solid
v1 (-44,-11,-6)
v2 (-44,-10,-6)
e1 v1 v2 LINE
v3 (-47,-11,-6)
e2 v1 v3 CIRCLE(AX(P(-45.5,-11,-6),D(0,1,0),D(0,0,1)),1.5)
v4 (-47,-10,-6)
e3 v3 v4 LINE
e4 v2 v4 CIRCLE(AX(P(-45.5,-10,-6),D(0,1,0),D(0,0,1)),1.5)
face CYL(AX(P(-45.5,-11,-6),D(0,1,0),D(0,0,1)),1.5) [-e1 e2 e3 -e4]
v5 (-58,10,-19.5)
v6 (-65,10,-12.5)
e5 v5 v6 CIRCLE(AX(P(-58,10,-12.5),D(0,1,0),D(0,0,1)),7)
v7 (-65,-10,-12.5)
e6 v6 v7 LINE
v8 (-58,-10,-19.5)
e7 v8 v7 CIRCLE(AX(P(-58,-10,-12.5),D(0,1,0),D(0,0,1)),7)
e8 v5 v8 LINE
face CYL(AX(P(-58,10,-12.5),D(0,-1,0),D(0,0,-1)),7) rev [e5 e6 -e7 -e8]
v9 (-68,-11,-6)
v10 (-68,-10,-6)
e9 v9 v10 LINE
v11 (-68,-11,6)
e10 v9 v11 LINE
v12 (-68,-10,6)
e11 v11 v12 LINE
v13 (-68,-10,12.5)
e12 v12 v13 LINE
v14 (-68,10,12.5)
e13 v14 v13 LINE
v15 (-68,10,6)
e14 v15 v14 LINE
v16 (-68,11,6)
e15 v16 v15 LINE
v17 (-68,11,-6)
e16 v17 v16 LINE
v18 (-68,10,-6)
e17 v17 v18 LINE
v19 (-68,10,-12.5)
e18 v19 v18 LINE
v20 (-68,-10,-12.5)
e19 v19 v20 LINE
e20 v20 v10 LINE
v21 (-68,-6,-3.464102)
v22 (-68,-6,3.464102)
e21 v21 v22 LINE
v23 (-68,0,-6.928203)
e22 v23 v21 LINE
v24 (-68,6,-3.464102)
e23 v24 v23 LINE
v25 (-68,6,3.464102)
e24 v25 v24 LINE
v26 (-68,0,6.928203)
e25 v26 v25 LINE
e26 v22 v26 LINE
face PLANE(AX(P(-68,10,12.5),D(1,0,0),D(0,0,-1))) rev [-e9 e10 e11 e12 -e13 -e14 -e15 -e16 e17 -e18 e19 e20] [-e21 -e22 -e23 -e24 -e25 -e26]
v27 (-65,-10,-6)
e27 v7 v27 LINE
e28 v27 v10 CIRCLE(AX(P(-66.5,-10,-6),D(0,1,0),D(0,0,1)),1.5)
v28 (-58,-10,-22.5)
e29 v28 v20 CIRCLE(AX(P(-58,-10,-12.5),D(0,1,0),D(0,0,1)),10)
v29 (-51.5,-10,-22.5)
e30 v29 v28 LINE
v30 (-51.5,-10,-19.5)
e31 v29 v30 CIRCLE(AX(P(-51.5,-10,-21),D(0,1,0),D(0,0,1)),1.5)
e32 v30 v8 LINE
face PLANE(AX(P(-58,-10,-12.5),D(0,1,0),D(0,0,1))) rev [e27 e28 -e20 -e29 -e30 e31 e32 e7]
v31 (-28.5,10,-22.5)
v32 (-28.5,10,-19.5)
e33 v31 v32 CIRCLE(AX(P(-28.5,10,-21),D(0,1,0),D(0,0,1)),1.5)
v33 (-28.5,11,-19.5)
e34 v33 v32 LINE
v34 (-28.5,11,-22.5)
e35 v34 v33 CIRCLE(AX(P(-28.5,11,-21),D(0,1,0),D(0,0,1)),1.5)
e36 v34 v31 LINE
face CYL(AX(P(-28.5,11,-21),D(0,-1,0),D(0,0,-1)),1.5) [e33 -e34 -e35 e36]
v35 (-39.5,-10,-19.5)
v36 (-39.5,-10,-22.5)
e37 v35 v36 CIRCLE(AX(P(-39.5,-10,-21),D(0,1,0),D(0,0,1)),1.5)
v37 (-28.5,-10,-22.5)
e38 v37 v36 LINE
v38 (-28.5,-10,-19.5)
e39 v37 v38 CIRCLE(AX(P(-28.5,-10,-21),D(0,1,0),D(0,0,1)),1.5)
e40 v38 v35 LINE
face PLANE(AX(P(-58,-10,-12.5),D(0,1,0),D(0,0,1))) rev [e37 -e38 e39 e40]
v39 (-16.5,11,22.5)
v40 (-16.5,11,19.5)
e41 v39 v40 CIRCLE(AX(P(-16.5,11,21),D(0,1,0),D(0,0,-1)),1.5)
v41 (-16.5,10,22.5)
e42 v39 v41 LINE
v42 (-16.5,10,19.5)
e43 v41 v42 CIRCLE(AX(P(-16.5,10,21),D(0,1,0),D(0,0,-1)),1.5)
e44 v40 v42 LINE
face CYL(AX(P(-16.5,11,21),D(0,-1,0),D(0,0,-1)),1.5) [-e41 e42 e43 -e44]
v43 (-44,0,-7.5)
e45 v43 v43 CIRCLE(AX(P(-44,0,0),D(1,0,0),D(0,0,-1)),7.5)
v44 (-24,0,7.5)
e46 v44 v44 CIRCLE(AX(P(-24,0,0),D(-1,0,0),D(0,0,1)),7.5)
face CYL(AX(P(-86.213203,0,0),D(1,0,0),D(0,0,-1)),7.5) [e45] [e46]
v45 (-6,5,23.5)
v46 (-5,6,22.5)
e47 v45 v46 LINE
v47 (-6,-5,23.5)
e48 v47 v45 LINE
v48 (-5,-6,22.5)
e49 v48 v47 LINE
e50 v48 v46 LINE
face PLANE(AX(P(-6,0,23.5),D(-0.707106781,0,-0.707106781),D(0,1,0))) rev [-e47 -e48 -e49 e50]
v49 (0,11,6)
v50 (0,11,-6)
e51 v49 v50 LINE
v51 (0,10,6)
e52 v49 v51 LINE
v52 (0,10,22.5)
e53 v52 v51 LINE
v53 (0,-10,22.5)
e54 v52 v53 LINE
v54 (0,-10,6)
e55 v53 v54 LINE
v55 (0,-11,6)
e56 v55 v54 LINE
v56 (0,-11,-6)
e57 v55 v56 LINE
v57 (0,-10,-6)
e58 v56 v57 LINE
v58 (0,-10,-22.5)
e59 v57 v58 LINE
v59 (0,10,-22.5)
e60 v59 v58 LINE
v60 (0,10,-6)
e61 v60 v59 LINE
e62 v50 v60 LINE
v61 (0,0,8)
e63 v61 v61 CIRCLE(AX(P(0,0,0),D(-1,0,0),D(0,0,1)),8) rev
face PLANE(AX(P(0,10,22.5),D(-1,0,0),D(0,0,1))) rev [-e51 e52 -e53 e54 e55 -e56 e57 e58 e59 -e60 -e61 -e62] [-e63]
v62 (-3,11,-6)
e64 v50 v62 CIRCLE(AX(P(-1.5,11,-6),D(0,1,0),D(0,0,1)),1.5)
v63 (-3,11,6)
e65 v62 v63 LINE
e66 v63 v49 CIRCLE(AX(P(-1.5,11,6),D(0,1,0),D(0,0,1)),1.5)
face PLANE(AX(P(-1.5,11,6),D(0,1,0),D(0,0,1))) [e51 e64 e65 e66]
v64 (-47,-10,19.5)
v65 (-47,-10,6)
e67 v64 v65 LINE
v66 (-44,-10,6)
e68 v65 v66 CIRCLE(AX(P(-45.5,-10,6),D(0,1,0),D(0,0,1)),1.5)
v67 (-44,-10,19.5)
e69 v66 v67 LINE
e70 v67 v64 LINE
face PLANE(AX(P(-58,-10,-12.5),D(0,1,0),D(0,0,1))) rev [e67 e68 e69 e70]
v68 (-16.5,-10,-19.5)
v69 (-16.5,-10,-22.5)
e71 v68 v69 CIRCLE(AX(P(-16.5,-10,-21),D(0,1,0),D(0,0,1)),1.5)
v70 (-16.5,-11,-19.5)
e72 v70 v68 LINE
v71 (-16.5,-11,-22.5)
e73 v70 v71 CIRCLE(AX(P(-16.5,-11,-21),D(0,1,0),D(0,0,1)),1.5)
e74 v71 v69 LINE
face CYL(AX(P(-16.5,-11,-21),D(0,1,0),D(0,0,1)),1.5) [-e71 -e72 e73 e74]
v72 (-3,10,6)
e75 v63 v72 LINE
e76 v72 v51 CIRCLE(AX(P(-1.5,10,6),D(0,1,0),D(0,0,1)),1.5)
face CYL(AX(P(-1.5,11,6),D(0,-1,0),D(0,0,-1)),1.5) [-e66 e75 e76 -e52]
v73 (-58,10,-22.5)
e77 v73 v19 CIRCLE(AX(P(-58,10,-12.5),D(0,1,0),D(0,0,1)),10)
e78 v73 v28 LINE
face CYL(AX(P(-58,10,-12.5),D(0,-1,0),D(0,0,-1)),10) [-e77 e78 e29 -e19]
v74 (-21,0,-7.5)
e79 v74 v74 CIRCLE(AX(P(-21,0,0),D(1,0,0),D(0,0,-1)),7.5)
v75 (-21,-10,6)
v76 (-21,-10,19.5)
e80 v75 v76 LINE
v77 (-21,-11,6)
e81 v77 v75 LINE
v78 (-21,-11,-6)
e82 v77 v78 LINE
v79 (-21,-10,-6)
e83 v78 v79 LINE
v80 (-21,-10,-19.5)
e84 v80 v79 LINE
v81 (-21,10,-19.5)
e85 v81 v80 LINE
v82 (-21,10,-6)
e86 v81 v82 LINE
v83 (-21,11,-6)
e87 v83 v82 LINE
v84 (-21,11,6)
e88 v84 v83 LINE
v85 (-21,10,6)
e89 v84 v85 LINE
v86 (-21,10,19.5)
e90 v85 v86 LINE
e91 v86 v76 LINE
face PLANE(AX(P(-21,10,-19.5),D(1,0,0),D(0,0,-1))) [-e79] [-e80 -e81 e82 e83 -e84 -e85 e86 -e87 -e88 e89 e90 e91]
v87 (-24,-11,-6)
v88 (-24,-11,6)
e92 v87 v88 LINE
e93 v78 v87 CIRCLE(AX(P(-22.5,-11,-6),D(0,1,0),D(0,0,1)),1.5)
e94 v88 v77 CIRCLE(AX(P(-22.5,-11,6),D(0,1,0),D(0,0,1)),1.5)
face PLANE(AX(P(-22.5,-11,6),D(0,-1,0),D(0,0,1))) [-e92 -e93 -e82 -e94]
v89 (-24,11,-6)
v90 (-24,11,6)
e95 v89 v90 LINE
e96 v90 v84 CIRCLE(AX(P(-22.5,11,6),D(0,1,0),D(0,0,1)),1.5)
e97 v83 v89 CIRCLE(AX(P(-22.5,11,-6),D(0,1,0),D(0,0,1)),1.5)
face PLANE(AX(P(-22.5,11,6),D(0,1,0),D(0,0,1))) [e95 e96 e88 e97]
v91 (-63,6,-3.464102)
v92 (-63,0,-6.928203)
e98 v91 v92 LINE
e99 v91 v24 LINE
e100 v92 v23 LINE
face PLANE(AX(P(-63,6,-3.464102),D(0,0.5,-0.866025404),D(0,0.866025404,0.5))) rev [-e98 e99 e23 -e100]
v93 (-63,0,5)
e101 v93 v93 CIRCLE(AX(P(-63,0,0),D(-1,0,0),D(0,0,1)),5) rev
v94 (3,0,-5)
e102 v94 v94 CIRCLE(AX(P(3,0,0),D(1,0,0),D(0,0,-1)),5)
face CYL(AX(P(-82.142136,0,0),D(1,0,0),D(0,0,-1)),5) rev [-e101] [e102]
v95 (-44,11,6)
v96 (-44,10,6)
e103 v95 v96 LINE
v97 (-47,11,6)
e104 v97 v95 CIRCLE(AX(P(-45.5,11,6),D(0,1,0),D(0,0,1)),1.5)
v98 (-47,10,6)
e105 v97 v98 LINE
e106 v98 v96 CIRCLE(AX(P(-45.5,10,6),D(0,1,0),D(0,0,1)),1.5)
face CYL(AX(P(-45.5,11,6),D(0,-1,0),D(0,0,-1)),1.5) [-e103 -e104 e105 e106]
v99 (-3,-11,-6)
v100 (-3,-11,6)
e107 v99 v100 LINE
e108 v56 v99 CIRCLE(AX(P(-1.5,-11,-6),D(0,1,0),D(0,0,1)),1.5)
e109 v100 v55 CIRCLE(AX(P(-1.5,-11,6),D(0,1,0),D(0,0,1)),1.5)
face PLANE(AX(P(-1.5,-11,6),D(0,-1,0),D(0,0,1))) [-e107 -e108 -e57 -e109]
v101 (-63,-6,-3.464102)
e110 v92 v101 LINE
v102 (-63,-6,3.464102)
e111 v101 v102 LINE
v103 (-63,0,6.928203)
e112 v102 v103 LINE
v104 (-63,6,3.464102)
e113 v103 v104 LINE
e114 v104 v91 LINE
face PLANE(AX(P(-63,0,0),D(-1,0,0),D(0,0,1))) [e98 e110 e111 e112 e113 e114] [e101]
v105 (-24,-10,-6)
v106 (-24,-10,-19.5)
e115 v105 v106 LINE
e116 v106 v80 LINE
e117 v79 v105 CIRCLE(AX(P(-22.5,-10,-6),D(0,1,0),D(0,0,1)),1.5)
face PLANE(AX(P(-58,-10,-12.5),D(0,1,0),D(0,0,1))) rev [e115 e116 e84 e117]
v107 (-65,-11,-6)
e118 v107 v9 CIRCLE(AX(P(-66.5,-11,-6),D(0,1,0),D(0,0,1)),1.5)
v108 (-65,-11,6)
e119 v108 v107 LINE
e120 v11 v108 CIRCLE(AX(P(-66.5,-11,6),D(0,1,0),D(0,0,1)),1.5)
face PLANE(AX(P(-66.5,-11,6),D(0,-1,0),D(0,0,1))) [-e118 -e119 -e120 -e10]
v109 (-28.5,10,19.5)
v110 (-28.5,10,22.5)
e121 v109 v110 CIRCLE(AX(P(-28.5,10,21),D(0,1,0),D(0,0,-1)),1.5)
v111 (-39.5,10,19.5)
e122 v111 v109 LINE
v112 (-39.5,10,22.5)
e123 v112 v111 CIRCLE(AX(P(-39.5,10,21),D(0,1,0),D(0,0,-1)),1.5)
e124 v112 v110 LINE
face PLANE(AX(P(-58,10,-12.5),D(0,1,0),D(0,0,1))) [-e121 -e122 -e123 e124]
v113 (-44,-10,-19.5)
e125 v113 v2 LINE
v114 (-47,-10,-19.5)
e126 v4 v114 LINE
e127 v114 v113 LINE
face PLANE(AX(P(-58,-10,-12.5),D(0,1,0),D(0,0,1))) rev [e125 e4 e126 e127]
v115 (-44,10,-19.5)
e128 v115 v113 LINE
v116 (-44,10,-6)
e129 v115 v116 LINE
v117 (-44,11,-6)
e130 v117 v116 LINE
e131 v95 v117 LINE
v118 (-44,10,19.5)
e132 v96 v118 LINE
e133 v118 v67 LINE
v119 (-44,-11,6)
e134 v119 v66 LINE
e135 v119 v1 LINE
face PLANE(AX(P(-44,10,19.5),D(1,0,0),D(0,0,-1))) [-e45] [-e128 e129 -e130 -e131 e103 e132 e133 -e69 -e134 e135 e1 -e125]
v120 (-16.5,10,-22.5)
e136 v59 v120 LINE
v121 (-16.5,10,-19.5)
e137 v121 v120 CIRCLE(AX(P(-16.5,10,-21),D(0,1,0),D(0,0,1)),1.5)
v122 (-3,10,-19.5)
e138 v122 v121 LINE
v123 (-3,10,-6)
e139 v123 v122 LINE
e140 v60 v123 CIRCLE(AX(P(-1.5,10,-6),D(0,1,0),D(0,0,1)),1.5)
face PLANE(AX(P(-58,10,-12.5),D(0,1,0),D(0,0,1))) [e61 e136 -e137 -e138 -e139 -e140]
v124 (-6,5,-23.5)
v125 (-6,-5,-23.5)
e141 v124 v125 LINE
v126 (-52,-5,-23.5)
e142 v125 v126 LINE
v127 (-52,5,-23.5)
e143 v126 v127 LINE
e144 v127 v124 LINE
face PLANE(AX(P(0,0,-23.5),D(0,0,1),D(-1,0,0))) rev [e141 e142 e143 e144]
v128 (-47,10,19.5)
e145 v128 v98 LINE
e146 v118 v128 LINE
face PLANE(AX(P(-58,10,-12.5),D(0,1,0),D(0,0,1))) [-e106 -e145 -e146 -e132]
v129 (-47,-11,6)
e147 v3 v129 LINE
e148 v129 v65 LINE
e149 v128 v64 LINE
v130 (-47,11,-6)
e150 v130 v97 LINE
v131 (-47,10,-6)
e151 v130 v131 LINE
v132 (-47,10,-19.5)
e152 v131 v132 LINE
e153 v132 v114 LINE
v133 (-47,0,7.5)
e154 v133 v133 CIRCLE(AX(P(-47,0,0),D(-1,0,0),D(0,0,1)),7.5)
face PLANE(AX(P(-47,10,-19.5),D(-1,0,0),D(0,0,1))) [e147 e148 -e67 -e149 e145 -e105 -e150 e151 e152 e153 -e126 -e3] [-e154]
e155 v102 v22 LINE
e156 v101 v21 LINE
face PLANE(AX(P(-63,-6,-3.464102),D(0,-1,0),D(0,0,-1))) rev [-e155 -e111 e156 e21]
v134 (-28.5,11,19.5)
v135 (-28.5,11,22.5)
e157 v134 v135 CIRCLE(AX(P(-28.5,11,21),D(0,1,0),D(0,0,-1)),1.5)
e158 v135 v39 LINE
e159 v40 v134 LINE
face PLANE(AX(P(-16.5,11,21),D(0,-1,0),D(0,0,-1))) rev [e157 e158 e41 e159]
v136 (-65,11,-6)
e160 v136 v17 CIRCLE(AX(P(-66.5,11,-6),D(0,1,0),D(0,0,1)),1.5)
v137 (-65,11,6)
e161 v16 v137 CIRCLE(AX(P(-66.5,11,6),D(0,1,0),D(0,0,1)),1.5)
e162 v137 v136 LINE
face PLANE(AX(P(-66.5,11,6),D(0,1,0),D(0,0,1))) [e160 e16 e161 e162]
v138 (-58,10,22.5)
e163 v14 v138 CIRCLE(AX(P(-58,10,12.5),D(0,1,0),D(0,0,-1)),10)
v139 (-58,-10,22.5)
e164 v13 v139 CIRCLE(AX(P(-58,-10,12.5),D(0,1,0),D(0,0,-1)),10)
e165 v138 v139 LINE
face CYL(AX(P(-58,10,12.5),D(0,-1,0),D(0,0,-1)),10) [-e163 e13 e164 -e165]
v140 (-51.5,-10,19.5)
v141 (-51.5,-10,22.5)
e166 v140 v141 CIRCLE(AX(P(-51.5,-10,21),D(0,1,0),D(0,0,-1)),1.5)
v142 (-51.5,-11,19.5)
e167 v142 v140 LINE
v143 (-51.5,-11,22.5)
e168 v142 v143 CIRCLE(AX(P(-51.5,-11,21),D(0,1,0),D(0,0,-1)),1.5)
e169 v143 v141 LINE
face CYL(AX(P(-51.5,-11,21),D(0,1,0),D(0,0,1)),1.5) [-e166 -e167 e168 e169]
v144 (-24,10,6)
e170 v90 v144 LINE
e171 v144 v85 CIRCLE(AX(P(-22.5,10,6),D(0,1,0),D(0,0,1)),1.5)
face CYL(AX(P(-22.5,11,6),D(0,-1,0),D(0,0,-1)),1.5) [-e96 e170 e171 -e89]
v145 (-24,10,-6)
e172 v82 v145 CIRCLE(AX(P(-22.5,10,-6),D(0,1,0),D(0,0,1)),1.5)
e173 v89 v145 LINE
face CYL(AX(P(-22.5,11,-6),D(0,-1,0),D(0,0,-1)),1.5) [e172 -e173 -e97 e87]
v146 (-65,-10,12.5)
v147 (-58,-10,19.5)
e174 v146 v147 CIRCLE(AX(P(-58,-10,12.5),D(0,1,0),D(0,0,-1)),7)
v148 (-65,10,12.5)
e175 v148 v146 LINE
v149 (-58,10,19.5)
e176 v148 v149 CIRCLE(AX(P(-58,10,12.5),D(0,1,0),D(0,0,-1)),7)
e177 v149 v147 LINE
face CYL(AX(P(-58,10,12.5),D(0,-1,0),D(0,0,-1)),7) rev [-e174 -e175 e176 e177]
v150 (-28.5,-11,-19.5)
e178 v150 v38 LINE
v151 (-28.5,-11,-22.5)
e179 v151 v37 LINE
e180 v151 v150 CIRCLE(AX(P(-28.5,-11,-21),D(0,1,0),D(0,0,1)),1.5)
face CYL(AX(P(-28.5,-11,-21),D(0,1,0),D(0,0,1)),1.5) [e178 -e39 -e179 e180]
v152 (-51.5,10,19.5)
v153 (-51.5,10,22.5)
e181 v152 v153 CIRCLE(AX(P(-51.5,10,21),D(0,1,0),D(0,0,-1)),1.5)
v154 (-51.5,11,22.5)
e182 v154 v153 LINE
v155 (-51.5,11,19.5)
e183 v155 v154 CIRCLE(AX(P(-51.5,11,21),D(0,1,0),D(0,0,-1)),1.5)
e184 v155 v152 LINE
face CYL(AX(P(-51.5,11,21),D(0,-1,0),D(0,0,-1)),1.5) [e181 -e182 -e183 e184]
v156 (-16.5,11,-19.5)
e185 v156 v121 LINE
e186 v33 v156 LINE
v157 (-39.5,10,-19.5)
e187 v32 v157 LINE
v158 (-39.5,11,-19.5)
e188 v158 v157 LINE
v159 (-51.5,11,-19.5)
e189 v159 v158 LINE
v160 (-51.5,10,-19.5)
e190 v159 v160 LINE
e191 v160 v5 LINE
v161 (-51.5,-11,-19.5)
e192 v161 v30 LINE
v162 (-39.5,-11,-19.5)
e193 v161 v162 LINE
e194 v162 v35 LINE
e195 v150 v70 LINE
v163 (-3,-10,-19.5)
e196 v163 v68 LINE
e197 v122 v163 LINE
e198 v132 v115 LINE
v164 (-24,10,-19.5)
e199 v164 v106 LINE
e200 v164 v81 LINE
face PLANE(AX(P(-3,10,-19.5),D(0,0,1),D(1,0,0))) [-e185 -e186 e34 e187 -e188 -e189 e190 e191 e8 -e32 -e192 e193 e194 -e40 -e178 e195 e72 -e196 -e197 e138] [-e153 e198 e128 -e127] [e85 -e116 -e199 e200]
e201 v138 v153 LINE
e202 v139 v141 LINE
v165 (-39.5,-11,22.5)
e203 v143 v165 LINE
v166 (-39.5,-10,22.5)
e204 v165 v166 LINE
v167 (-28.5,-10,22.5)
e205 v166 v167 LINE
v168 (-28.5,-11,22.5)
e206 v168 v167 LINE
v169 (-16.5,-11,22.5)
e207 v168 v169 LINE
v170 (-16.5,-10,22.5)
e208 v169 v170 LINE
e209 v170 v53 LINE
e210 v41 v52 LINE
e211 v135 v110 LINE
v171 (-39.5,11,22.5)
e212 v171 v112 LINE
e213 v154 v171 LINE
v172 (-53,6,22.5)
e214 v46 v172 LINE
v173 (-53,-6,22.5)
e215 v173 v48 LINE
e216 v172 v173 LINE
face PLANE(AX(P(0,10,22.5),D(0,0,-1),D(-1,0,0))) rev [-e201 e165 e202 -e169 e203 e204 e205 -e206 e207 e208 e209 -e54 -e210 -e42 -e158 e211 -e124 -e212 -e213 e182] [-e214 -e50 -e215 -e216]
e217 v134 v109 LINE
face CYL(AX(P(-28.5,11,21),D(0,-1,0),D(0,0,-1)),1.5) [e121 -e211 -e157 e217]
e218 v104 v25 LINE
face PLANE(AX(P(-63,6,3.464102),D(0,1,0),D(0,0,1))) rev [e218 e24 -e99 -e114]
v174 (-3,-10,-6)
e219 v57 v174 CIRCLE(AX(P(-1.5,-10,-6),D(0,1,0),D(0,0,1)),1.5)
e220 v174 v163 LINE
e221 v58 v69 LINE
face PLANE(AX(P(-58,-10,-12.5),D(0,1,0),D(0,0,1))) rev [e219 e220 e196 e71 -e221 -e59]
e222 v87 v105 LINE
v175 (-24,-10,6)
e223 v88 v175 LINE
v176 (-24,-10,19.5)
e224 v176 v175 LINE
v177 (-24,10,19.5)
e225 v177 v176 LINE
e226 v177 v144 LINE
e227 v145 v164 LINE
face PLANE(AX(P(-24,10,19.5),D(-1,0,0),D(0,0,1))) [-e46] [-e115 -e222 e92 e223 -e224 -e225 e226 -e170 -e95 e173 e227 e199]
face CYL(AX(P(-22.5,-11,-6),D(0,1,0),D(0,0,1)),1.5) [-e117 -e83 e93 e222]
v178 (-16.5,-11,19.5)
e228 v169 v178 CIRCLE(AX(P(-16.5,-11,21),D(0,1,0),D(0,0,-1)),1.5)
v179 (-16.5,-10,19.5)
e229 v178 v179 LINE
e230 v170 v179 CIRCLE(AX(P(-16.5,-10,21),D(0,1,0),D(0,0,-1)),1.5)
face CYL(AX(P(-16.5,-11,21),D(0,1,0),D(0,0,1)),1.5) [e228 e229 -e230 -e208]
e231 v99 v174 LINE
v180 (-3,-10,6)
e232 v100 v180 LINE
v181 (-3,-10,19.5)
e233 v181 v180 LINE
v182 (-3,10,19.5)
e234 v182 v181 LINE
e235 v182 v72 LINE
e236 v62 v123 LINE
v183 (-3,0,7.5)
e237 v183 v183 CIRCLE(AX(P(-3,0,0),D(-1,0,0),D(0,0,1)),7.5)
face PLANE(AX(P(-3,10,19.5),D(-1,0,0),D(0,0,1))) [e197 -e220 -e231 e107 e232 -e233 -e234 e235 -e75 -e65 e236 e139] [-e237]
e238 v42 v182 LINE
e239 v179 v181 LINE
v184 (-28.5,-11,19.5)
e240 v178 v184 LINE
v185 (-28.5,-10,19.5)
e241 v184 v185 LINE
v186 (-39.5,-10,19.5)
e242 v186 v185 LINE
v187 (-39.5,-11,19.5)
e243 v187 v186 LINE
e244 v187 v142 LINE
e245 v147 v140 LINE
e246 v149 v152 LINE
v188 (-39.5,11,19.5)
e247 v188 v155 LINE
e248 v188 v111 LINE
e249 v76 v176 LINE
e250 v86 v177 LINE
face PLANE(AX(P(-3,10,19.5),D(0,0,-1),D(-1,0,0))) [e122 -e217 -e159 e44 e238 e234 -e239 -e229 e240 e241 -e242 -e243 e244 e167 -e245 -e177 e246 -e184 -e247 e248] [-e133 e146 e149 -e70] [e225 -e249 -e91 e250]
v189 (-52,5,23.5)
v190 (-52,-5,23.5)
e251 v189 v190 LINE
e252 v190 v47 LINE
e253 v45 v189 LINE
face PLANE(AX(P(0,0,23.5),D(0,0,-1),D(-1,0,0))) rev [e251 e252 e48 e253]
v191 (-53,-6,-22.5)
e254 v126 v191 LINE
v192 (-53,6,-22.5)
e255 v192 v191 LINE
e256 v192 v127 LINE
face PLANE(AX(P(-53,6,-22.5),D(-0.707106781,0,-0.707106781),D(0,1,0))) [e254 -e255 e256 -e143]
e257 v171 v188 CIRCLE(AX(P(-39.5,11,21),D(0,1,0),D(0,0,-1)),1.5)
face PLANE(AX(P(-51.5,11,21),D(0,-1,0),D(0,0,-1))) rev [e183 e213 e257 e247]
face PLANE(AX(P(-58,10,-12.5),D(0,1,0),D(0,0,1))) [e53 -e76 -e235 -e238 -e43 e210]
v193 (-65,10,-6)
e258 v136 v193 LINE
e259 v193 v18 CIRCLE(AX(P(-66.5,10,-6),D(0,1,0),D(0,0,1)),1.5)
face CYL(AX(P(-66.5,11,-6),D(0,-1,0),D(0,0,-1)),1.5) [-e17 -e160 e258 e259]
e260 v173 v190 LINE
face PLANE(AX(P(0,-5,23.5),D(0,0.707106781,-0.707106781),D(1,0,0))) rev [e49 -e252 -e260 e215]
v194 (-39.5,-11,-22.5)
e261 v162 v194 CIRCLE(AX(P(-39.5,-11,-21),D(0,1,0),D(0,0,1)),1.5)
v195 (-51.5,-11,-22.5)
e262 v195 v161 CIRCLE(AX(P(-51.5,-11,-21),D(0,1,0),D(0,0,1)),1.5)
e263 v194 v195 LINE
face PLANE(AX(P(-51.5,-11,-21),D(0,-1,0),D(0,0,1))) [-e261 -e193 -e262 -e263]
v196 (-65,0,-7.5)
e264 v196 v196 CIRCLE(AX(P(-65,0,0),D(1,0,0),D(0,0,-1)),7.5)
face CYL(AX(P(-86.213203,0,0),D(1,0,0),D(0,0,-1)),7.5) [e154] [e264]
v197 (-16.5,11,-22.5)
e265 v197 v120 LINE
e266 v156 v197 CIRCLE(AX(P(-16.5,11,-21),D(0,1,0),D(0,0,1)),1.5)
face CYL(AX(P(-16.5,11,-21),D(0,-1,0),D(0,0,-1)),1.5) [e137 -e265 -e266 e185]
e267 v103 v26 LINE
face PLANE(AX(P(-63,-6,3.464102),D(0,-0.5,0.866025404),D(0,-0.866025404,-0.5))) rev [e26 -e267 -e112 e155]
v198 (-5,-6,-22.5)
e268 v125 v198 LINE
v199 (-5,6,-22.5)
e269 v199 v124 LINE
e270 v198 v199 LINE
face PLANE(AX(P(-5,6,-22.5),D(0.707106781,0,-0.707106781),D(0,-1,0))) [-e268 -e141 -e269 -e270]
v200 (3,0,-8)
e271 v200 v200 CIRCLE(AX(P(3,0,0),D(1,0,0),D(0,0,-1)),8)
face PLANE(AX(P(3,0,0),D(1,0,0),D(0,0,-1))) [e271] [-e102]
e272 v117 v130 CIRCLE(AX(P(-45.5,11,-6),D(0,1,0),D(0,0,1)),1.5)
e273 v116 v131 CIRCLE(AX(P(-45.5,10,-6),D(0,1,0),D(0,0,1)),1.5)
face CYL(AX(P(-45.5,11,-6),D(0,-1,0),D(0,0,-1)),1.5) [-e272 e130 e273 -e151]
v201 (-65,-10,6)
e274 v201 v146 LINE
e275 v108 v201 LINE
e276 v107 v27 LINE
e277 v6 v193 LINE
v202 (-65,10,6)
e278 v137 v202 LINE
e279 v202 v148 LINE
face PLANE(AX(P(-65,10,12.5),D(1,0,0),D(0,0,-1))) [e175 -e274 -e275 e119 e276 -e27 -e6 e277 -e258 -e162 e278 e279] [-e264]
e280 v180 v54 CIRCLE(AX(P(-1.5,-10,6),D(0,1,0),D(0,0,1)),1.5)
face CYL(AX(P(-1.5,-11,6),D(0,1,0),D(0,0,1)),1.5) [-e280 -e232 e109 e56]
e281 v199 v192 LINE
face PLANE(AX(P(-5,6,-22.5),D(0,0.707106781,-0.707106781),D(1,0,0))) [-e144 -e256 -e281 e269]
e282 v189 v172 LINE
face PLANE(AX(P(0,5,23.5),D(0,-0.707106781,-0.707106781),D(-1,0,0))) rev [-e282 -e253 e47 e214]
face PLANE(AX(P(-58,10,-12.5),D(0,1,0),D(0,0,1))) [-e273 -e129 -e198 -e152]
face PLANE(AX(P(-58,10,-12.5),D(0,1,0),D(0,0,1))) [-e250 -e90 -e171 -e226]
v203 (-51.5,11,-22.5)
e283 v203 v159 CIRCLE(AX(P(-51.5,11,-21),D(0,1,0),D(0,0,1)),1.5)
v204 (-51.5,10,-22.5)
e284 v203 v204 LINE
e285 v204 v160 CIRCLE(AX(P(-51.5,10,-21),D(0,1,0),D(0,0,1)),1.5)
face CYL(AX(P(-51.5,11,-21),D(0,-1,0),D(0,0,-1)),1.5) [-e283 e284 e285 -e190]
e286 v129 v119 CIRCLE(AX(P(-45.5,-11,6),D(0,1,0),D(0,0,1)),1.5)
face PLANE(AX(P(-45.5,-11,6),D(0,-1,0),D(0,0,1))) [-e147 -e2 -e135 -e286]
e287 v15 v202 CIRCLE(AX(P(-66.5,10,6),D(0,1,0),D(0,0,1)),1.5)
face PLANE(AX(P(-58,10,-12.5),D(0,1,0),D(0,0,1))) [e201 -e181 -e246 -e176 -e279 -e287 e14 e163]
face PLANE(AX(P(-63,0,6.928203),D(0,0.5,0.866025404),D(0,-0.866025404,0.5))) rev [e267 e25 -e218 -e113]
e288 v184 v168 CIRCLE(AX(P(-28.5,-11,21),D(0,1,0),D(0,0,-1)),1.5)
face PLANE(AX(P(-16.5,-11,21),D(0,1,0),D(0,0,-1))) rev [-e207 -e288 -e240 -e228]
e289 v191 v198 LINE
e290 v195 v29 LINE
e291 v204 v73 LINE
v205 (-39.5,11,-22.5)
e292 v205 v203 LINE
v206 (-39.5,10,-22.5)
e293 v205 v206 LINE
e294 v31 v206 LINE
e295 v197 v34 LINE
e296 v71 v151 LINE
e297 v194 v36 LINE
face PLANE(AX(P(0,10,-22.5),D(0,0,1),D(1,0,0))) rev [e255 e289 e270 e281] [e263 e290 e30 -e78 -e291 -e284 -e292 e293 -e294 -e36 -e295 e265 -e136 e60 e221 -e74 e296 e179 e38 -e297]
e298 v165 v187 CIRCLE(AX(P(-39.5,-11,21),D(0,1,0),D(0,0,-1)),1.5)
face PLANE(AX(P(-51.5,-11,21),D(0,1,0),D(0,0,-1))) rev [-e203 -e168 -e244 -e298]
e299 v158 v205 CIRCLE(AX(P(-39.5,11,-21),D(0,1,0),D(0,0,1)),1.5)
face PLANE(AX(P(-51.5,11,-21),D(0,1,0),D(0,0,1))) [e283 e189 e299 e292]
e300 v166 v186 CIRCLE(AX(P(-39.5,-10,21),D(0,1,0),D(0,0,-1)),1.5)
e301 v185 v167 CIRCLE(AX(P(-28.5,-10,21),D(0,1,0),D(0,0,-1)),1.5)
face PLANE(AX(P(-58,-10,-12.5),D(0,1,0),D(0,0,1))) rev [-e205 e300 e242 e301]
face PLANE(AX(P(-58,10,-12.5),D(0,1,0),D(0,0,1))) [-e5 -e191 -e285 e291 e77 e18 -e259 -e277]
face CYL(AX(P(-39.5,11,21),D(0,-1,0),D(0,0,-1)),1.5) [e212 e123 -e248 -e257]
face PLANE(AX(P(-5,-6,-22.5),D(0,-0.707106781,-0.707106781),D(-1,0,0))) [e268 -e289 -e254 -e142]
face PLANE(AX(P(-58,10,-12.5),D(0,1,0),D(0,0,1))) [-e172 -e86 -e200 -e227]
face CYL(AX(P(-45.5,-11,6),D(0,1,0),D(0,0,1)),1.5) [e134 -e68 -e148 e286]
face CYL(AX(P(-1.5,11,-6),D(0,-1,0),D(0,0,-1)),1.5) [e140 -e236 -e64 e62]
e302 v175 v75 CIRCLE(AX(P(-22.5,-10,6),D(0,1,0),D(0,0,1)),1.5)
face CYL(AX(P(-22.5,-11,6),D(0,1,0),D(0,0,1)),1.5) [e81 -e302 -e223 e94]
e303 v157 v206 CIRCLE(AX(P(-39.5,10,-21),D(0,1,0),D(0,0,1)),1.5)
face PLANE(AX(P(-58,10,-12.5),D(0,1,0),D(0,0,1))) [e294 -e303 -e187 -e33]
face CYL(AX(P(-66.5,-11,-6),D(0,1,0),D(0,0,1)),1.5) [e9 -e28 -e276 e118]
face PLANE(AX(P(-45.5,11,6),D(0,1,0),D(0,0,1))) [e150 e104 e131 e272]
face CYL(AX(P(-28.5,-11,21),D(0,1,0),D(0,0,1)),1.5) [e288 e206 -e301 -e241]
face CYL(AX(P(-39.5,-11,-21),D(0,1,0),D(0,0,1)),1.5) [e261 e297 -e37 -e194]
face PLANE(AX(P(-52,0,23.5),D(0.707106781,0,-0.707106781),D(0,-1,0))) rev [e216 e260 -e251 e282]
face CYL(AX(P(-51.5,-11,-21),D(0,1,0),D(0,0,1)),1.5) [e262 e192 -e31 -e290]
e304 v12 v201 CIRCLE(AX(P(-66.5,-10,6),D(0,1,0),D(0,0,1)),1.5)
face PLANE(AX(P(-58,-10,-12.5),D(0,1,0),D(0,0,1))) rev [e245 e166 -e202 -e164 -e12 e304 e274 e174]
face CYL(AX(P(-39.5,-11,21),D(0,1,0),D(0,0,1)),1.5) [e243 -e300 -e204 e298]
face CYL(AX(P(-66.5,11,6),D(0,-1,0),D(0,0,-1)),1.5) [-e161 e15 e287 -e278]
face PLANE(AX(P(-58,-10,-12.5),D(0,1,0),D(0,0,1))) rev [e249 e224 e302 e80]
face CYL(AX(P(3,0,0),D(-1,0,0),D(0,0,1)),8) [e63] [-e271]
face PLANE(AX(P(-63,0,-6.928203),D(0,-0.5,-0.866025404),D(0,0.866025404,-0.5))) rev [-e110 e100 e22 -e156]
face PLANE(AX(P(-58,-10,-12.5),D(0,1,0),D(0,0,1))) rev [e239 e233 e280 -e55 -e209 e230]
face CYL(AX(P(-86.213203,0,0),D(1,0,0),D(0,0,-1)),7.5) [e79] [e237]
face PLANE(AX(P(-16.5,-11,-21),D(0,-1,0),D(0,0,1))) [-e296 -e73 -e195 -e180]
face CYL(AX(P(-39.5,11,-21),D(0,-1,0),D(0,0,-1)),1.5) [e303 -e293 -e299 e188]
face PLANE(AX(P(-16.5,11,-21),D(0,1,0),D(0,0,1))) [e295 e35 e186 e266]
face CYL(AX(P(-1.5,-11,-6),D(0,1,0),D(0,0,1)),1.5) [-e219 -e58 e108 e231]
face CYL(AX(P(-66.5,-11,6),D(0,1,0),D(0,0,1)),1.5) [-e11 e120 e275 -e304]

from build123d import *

# Parameters (mm, degrees)
SKETCH1_W                = 18
SKETCH1_H                = 39
SKETCH1_W_2              = 20
BOSS_EXTRUDE1_DEPTH      = 10
BOSS_EXTRUDE3_REACH      = 74.32
SKETCH3_R                = 7.5
SKETCH4_R                = 5
CUT_EXTRUDE1_DEPTH       = 68
CUT_EXTRUDE2_DEPTH       = 5
BOSS_EXTRUDE4_START      = 3
SKETCH6_R                = 8
SKETCH6_R_2              = 5
BOSS_EXTRUDE4_DEPTH      = 3
BOSS_EXTRUDE5_DEPTH      = 1
SKETCH8_W                = 48
SKETCH8_H                = 12
BOSS_EXTRUDE6_DEPTH      = 1
CHAMFER1_SIZE            = 1
CHAMFER1_OF_MIRROR2_SIZE = 1


with BuildPart() as part:
    # Sketch1 → Boss-Extrude1 (new, symmetric)
    with BuildSketch(Plane(origin=(0, 0, 0), x_dir=(1, 0, 0), z_dir=(0, 1, 0))):
        with BuildLine():
            Line((0, -22.5), (-58, -22.5))
            ThreePointArc((-58, -22.5), (-65.071067812, -19.571067812), (-68, -12.5))
            Line((-68, -12.5), (-68, 12.5))
            ThreePointArc((-68, 12.5), (-65.071067812, 19.571067812), (-58, 22.5))
            Line((-58, 22.5), (0, 22.5))
            Line((0, 22.5), (0, -22.5))
        make_face()
        with Locations((-12, 0)):
            Rectangle(SKETCH1_W, SKETCH1_H, mode=Mode.SUBTRACT)
        with BuildLine():
            Line((-65, -12.5), (-65, 12.5))
            ThreePointArc((-65, 12.5), (-62.949747468, 17.449747468), (-58, 19.5))
            Line((-58, 19.5), (-47, 19.5))
            Line((-47, 19.5), (-47, -19.5))
            Line((-47, -19.5), (-58, -19.5))
            ThreePointArc((-58, -19.5), (-62.949747468, -17.449747468), (-65, -12.5))
        make_face(mode=Mode.SUBTRACT)
        with Locations((-34, 0)):
            Rectangle(SKETCH1_W_2, SKETCH1_H, mode=Mode.SUBTRACT)
    extrude(amount=BOSS_EXTRUDE1_DEPTH, both=True)

    # Boss-Extrude3: up to this face of the body (flat: up to its plane)
    boss_extrude3_end = Plane(part.part.faces().sort_by_distance((-65, 0, 0))[0])
    # Sketch3 → Boss-Extrude3 (add, up to the picked face)
    with BuildSketch(Plane(origin=(0, 0, 0), x_dir=(0, 0, -1), z_dir=(1, 0, 0)), mode=Mode.PRIVATE) as boss_extrude3_sk1:
        Circle(SKETCH3_R)
    boss_extrude3_tool1 = split(extrude(boss_extrude3_sk1.sketch, amount=-BOSS_EXTRUDE3_REACH, mode=Mode.PRIVATE), bisect_by=boss_extrude3_end, keep=Keep.BOTH, mode=Mode.PRIVATE)
    add(boss_extrude3_tool1.solids().sort_by(Axis((0, 0, 0), (-1, 0, 0)))[0])

    # Sketch4 → Cut-Extrude1 (cut)
    with BuildSketch(Plane(origin=(0, 0, 0), x_dir=(0, 0, -1), z_dir=(1, 0, 0))):
        Circle(SKETCH4_R)
    extrude(amount=-CUT_EXTRUDE1_DEPTH, mode=Mode.SUBTRACT)

    # Sketch5 → Cut-Extrude2 (cut)
    with BuildSketch(Plane.ZY.offset(68)):
        Polygon((3.464101615, 6), (-3.464101615, 6), (-6.92820323, 0), (-3.464101615, -6), (3.464101615, -6), (6.92820323, 0), align=None)
    extrude(amount=-CUT_EXTRUDE2_DEPTH, mode=Mode.SUBTRACT)

    # Sketch6 → Boss-Extrude4 (add)
    with BuildSketch(Plane(origin=(0, 0, 0), x_dir=(0, 0, -1), z_dir=(1, 0, 0)).offset(BOSS_EXTRUDE4_START)):
        with Locations(Location((0, 0, 0), (0, 0, 180))):
            Circle(SKETCH6_R)
        Circle(SKETCH6_R_2, mode=Mode.SUBTRACT)
    extrude(amount=-BOSS_EXTRUDE4_DEPTH)

    # Sketch7 → Boss-Extrude5 (add)
    with BuildSketch(Plane(origin=(0, 10, 0), x_dir=(1, 0, 0), z_dir=(0, 1, 0))):
        with BuildLine():
            Line((-16.5, 19.5), (-28.5, 19.5))
            ThreePointArc((-28.5, 19.5), (-30, 21), (-28.5, 22.5))
            Line((-28.5, 22.5), (-16.5, 22.5))
            ThreePointArc((-16.5, 22.5), (-15, 21), (-16.5, 19.5))
        make_face()
        with BuildLine():
            Line((-51.5, 22.5), (-39.5, 22.5))
            ThreePointArc((-39.5, 22.5), (-38, 21), (-39.5, 19.5))
            Line((-39.5, 19.5), (-51.5, 19.5))
            ThreePointArc((-51.5, 19.5), (-53, 21), (-51.5, 22.5))
        make_face()
        with BuildLine():
            Line((-16.5, -19.5), (-28.5, -19.5))
            ThreePointArc((-28.5, -19.5), (-30, -21), (-28.5, -22.5))
            Line((-28.5, -22.5), (-16.5, -22.5))
            ThreePointArc((-16.5, -22.5), (-15, -21), (-16.5, -19.5))
        make_face()
        with BuildLine():
            Line((-51.5, -22.5), (-39.5, -22.5))
            ThreePointArc((-39.5, -22.5), (-38, -21), (-39.5, -19.5))
            Line((-39.5, -19.5), (-51.5, -19.5))
            ThreePointArc((-51.5, -19.5), (-53, -21), (-51.5, -22.5))
        make_face()
        with BuildLine():
            Line((-68, -6), (-68, 6))
            ThreePointArc((-68, 6), (-66.5, 7.5), (-65, 6))
            Line((-65, 6), (-65, -6))
            ThreePointArc((-65, -6), (-66.5, -7.5), (-68, -6))
        make_face()
        with BuildLine():
            Line((-24, -6), (-24, 6))
            ThreePointArc((-24, 6), (-22.5, 7.5), (-21, 6))
            Line((-21, 6), (-21, -6))
            ThreePointArc((-21, -6), (-22.5, -7.5), (-24, -6))
        make_face()
        with BuildLine():
            Line((-47, -6), (-47, 6))
            ThreePointArc((-47, 6), (-45.5, 7.5), (-44, 6))
            Line((-44, 6), (-44, -6))
            ThreePointArc((-44, -6), (-45.5, -7.5), (-47, -6))
        make_face()
        with BuildLine():
            Line((-3, -6), (-3, 6))
            ThreePointArc((-3, 6), (-1.5, 7.5), (0, 6))
            Line((0, 6), (0, -6))
            ThreePointArc((0, -6), (-1.5, -7.5), (-3, -6))
        make_face()
    boss_extrude5 = extrude(amount=BOSS_EXTRUDE5_DEPTH)

    # Mirror1: Boss-Extrude5 across plane
    add(boss_extrude5.mirror(Plane.ZX))

    # Sketch8 → Boss-Extrude6 (add)
    with BuildSketch(Plane.XY.offset(22.5)):
        with Locations((-29, 0)):
            Rectangle(SKETCH8_W, SKETCH8_H)
    boss_extrude6 = extrude(amount=BOSS_EXTRUDE6_DEPTH)

    # Chamfer1
    chamfer1_edges = [part.edges().sort_by_distance(p)[0] for p in [
        (-53, 0, 23.5),
        (-29, -6, 23.5),
        (-5, 0, 23.5),
        (-29, 6, 23.5),
    ]]
    chamfer(chamfer1_edges, length=CHAMFER1_SIZE - 0.0001)  # a hair under: the kernel refuses the full size

    # Mirror2: Boss-Extrude6 across plane
    add(boss_extrude6.mirror(Plane.XY))

    # Chamfer1 of Mirror2
    chamfer1_of_mirror2_edges = [part.edges().sort_by_distance(p)[0] for p in [
        (-53, 0, -23.5),
        (-29, -6, -23.5),
        (-5, 0, -23.5),
        (-29, 6, -23.5),
    ]]
    chamfer(chamfer1_of_mirror2_edges, length=CHAMFER1_OF_MIRROR2_SIZE - 0.0001)  # a hair under: the kernel refuses the full size


solid = part.part
